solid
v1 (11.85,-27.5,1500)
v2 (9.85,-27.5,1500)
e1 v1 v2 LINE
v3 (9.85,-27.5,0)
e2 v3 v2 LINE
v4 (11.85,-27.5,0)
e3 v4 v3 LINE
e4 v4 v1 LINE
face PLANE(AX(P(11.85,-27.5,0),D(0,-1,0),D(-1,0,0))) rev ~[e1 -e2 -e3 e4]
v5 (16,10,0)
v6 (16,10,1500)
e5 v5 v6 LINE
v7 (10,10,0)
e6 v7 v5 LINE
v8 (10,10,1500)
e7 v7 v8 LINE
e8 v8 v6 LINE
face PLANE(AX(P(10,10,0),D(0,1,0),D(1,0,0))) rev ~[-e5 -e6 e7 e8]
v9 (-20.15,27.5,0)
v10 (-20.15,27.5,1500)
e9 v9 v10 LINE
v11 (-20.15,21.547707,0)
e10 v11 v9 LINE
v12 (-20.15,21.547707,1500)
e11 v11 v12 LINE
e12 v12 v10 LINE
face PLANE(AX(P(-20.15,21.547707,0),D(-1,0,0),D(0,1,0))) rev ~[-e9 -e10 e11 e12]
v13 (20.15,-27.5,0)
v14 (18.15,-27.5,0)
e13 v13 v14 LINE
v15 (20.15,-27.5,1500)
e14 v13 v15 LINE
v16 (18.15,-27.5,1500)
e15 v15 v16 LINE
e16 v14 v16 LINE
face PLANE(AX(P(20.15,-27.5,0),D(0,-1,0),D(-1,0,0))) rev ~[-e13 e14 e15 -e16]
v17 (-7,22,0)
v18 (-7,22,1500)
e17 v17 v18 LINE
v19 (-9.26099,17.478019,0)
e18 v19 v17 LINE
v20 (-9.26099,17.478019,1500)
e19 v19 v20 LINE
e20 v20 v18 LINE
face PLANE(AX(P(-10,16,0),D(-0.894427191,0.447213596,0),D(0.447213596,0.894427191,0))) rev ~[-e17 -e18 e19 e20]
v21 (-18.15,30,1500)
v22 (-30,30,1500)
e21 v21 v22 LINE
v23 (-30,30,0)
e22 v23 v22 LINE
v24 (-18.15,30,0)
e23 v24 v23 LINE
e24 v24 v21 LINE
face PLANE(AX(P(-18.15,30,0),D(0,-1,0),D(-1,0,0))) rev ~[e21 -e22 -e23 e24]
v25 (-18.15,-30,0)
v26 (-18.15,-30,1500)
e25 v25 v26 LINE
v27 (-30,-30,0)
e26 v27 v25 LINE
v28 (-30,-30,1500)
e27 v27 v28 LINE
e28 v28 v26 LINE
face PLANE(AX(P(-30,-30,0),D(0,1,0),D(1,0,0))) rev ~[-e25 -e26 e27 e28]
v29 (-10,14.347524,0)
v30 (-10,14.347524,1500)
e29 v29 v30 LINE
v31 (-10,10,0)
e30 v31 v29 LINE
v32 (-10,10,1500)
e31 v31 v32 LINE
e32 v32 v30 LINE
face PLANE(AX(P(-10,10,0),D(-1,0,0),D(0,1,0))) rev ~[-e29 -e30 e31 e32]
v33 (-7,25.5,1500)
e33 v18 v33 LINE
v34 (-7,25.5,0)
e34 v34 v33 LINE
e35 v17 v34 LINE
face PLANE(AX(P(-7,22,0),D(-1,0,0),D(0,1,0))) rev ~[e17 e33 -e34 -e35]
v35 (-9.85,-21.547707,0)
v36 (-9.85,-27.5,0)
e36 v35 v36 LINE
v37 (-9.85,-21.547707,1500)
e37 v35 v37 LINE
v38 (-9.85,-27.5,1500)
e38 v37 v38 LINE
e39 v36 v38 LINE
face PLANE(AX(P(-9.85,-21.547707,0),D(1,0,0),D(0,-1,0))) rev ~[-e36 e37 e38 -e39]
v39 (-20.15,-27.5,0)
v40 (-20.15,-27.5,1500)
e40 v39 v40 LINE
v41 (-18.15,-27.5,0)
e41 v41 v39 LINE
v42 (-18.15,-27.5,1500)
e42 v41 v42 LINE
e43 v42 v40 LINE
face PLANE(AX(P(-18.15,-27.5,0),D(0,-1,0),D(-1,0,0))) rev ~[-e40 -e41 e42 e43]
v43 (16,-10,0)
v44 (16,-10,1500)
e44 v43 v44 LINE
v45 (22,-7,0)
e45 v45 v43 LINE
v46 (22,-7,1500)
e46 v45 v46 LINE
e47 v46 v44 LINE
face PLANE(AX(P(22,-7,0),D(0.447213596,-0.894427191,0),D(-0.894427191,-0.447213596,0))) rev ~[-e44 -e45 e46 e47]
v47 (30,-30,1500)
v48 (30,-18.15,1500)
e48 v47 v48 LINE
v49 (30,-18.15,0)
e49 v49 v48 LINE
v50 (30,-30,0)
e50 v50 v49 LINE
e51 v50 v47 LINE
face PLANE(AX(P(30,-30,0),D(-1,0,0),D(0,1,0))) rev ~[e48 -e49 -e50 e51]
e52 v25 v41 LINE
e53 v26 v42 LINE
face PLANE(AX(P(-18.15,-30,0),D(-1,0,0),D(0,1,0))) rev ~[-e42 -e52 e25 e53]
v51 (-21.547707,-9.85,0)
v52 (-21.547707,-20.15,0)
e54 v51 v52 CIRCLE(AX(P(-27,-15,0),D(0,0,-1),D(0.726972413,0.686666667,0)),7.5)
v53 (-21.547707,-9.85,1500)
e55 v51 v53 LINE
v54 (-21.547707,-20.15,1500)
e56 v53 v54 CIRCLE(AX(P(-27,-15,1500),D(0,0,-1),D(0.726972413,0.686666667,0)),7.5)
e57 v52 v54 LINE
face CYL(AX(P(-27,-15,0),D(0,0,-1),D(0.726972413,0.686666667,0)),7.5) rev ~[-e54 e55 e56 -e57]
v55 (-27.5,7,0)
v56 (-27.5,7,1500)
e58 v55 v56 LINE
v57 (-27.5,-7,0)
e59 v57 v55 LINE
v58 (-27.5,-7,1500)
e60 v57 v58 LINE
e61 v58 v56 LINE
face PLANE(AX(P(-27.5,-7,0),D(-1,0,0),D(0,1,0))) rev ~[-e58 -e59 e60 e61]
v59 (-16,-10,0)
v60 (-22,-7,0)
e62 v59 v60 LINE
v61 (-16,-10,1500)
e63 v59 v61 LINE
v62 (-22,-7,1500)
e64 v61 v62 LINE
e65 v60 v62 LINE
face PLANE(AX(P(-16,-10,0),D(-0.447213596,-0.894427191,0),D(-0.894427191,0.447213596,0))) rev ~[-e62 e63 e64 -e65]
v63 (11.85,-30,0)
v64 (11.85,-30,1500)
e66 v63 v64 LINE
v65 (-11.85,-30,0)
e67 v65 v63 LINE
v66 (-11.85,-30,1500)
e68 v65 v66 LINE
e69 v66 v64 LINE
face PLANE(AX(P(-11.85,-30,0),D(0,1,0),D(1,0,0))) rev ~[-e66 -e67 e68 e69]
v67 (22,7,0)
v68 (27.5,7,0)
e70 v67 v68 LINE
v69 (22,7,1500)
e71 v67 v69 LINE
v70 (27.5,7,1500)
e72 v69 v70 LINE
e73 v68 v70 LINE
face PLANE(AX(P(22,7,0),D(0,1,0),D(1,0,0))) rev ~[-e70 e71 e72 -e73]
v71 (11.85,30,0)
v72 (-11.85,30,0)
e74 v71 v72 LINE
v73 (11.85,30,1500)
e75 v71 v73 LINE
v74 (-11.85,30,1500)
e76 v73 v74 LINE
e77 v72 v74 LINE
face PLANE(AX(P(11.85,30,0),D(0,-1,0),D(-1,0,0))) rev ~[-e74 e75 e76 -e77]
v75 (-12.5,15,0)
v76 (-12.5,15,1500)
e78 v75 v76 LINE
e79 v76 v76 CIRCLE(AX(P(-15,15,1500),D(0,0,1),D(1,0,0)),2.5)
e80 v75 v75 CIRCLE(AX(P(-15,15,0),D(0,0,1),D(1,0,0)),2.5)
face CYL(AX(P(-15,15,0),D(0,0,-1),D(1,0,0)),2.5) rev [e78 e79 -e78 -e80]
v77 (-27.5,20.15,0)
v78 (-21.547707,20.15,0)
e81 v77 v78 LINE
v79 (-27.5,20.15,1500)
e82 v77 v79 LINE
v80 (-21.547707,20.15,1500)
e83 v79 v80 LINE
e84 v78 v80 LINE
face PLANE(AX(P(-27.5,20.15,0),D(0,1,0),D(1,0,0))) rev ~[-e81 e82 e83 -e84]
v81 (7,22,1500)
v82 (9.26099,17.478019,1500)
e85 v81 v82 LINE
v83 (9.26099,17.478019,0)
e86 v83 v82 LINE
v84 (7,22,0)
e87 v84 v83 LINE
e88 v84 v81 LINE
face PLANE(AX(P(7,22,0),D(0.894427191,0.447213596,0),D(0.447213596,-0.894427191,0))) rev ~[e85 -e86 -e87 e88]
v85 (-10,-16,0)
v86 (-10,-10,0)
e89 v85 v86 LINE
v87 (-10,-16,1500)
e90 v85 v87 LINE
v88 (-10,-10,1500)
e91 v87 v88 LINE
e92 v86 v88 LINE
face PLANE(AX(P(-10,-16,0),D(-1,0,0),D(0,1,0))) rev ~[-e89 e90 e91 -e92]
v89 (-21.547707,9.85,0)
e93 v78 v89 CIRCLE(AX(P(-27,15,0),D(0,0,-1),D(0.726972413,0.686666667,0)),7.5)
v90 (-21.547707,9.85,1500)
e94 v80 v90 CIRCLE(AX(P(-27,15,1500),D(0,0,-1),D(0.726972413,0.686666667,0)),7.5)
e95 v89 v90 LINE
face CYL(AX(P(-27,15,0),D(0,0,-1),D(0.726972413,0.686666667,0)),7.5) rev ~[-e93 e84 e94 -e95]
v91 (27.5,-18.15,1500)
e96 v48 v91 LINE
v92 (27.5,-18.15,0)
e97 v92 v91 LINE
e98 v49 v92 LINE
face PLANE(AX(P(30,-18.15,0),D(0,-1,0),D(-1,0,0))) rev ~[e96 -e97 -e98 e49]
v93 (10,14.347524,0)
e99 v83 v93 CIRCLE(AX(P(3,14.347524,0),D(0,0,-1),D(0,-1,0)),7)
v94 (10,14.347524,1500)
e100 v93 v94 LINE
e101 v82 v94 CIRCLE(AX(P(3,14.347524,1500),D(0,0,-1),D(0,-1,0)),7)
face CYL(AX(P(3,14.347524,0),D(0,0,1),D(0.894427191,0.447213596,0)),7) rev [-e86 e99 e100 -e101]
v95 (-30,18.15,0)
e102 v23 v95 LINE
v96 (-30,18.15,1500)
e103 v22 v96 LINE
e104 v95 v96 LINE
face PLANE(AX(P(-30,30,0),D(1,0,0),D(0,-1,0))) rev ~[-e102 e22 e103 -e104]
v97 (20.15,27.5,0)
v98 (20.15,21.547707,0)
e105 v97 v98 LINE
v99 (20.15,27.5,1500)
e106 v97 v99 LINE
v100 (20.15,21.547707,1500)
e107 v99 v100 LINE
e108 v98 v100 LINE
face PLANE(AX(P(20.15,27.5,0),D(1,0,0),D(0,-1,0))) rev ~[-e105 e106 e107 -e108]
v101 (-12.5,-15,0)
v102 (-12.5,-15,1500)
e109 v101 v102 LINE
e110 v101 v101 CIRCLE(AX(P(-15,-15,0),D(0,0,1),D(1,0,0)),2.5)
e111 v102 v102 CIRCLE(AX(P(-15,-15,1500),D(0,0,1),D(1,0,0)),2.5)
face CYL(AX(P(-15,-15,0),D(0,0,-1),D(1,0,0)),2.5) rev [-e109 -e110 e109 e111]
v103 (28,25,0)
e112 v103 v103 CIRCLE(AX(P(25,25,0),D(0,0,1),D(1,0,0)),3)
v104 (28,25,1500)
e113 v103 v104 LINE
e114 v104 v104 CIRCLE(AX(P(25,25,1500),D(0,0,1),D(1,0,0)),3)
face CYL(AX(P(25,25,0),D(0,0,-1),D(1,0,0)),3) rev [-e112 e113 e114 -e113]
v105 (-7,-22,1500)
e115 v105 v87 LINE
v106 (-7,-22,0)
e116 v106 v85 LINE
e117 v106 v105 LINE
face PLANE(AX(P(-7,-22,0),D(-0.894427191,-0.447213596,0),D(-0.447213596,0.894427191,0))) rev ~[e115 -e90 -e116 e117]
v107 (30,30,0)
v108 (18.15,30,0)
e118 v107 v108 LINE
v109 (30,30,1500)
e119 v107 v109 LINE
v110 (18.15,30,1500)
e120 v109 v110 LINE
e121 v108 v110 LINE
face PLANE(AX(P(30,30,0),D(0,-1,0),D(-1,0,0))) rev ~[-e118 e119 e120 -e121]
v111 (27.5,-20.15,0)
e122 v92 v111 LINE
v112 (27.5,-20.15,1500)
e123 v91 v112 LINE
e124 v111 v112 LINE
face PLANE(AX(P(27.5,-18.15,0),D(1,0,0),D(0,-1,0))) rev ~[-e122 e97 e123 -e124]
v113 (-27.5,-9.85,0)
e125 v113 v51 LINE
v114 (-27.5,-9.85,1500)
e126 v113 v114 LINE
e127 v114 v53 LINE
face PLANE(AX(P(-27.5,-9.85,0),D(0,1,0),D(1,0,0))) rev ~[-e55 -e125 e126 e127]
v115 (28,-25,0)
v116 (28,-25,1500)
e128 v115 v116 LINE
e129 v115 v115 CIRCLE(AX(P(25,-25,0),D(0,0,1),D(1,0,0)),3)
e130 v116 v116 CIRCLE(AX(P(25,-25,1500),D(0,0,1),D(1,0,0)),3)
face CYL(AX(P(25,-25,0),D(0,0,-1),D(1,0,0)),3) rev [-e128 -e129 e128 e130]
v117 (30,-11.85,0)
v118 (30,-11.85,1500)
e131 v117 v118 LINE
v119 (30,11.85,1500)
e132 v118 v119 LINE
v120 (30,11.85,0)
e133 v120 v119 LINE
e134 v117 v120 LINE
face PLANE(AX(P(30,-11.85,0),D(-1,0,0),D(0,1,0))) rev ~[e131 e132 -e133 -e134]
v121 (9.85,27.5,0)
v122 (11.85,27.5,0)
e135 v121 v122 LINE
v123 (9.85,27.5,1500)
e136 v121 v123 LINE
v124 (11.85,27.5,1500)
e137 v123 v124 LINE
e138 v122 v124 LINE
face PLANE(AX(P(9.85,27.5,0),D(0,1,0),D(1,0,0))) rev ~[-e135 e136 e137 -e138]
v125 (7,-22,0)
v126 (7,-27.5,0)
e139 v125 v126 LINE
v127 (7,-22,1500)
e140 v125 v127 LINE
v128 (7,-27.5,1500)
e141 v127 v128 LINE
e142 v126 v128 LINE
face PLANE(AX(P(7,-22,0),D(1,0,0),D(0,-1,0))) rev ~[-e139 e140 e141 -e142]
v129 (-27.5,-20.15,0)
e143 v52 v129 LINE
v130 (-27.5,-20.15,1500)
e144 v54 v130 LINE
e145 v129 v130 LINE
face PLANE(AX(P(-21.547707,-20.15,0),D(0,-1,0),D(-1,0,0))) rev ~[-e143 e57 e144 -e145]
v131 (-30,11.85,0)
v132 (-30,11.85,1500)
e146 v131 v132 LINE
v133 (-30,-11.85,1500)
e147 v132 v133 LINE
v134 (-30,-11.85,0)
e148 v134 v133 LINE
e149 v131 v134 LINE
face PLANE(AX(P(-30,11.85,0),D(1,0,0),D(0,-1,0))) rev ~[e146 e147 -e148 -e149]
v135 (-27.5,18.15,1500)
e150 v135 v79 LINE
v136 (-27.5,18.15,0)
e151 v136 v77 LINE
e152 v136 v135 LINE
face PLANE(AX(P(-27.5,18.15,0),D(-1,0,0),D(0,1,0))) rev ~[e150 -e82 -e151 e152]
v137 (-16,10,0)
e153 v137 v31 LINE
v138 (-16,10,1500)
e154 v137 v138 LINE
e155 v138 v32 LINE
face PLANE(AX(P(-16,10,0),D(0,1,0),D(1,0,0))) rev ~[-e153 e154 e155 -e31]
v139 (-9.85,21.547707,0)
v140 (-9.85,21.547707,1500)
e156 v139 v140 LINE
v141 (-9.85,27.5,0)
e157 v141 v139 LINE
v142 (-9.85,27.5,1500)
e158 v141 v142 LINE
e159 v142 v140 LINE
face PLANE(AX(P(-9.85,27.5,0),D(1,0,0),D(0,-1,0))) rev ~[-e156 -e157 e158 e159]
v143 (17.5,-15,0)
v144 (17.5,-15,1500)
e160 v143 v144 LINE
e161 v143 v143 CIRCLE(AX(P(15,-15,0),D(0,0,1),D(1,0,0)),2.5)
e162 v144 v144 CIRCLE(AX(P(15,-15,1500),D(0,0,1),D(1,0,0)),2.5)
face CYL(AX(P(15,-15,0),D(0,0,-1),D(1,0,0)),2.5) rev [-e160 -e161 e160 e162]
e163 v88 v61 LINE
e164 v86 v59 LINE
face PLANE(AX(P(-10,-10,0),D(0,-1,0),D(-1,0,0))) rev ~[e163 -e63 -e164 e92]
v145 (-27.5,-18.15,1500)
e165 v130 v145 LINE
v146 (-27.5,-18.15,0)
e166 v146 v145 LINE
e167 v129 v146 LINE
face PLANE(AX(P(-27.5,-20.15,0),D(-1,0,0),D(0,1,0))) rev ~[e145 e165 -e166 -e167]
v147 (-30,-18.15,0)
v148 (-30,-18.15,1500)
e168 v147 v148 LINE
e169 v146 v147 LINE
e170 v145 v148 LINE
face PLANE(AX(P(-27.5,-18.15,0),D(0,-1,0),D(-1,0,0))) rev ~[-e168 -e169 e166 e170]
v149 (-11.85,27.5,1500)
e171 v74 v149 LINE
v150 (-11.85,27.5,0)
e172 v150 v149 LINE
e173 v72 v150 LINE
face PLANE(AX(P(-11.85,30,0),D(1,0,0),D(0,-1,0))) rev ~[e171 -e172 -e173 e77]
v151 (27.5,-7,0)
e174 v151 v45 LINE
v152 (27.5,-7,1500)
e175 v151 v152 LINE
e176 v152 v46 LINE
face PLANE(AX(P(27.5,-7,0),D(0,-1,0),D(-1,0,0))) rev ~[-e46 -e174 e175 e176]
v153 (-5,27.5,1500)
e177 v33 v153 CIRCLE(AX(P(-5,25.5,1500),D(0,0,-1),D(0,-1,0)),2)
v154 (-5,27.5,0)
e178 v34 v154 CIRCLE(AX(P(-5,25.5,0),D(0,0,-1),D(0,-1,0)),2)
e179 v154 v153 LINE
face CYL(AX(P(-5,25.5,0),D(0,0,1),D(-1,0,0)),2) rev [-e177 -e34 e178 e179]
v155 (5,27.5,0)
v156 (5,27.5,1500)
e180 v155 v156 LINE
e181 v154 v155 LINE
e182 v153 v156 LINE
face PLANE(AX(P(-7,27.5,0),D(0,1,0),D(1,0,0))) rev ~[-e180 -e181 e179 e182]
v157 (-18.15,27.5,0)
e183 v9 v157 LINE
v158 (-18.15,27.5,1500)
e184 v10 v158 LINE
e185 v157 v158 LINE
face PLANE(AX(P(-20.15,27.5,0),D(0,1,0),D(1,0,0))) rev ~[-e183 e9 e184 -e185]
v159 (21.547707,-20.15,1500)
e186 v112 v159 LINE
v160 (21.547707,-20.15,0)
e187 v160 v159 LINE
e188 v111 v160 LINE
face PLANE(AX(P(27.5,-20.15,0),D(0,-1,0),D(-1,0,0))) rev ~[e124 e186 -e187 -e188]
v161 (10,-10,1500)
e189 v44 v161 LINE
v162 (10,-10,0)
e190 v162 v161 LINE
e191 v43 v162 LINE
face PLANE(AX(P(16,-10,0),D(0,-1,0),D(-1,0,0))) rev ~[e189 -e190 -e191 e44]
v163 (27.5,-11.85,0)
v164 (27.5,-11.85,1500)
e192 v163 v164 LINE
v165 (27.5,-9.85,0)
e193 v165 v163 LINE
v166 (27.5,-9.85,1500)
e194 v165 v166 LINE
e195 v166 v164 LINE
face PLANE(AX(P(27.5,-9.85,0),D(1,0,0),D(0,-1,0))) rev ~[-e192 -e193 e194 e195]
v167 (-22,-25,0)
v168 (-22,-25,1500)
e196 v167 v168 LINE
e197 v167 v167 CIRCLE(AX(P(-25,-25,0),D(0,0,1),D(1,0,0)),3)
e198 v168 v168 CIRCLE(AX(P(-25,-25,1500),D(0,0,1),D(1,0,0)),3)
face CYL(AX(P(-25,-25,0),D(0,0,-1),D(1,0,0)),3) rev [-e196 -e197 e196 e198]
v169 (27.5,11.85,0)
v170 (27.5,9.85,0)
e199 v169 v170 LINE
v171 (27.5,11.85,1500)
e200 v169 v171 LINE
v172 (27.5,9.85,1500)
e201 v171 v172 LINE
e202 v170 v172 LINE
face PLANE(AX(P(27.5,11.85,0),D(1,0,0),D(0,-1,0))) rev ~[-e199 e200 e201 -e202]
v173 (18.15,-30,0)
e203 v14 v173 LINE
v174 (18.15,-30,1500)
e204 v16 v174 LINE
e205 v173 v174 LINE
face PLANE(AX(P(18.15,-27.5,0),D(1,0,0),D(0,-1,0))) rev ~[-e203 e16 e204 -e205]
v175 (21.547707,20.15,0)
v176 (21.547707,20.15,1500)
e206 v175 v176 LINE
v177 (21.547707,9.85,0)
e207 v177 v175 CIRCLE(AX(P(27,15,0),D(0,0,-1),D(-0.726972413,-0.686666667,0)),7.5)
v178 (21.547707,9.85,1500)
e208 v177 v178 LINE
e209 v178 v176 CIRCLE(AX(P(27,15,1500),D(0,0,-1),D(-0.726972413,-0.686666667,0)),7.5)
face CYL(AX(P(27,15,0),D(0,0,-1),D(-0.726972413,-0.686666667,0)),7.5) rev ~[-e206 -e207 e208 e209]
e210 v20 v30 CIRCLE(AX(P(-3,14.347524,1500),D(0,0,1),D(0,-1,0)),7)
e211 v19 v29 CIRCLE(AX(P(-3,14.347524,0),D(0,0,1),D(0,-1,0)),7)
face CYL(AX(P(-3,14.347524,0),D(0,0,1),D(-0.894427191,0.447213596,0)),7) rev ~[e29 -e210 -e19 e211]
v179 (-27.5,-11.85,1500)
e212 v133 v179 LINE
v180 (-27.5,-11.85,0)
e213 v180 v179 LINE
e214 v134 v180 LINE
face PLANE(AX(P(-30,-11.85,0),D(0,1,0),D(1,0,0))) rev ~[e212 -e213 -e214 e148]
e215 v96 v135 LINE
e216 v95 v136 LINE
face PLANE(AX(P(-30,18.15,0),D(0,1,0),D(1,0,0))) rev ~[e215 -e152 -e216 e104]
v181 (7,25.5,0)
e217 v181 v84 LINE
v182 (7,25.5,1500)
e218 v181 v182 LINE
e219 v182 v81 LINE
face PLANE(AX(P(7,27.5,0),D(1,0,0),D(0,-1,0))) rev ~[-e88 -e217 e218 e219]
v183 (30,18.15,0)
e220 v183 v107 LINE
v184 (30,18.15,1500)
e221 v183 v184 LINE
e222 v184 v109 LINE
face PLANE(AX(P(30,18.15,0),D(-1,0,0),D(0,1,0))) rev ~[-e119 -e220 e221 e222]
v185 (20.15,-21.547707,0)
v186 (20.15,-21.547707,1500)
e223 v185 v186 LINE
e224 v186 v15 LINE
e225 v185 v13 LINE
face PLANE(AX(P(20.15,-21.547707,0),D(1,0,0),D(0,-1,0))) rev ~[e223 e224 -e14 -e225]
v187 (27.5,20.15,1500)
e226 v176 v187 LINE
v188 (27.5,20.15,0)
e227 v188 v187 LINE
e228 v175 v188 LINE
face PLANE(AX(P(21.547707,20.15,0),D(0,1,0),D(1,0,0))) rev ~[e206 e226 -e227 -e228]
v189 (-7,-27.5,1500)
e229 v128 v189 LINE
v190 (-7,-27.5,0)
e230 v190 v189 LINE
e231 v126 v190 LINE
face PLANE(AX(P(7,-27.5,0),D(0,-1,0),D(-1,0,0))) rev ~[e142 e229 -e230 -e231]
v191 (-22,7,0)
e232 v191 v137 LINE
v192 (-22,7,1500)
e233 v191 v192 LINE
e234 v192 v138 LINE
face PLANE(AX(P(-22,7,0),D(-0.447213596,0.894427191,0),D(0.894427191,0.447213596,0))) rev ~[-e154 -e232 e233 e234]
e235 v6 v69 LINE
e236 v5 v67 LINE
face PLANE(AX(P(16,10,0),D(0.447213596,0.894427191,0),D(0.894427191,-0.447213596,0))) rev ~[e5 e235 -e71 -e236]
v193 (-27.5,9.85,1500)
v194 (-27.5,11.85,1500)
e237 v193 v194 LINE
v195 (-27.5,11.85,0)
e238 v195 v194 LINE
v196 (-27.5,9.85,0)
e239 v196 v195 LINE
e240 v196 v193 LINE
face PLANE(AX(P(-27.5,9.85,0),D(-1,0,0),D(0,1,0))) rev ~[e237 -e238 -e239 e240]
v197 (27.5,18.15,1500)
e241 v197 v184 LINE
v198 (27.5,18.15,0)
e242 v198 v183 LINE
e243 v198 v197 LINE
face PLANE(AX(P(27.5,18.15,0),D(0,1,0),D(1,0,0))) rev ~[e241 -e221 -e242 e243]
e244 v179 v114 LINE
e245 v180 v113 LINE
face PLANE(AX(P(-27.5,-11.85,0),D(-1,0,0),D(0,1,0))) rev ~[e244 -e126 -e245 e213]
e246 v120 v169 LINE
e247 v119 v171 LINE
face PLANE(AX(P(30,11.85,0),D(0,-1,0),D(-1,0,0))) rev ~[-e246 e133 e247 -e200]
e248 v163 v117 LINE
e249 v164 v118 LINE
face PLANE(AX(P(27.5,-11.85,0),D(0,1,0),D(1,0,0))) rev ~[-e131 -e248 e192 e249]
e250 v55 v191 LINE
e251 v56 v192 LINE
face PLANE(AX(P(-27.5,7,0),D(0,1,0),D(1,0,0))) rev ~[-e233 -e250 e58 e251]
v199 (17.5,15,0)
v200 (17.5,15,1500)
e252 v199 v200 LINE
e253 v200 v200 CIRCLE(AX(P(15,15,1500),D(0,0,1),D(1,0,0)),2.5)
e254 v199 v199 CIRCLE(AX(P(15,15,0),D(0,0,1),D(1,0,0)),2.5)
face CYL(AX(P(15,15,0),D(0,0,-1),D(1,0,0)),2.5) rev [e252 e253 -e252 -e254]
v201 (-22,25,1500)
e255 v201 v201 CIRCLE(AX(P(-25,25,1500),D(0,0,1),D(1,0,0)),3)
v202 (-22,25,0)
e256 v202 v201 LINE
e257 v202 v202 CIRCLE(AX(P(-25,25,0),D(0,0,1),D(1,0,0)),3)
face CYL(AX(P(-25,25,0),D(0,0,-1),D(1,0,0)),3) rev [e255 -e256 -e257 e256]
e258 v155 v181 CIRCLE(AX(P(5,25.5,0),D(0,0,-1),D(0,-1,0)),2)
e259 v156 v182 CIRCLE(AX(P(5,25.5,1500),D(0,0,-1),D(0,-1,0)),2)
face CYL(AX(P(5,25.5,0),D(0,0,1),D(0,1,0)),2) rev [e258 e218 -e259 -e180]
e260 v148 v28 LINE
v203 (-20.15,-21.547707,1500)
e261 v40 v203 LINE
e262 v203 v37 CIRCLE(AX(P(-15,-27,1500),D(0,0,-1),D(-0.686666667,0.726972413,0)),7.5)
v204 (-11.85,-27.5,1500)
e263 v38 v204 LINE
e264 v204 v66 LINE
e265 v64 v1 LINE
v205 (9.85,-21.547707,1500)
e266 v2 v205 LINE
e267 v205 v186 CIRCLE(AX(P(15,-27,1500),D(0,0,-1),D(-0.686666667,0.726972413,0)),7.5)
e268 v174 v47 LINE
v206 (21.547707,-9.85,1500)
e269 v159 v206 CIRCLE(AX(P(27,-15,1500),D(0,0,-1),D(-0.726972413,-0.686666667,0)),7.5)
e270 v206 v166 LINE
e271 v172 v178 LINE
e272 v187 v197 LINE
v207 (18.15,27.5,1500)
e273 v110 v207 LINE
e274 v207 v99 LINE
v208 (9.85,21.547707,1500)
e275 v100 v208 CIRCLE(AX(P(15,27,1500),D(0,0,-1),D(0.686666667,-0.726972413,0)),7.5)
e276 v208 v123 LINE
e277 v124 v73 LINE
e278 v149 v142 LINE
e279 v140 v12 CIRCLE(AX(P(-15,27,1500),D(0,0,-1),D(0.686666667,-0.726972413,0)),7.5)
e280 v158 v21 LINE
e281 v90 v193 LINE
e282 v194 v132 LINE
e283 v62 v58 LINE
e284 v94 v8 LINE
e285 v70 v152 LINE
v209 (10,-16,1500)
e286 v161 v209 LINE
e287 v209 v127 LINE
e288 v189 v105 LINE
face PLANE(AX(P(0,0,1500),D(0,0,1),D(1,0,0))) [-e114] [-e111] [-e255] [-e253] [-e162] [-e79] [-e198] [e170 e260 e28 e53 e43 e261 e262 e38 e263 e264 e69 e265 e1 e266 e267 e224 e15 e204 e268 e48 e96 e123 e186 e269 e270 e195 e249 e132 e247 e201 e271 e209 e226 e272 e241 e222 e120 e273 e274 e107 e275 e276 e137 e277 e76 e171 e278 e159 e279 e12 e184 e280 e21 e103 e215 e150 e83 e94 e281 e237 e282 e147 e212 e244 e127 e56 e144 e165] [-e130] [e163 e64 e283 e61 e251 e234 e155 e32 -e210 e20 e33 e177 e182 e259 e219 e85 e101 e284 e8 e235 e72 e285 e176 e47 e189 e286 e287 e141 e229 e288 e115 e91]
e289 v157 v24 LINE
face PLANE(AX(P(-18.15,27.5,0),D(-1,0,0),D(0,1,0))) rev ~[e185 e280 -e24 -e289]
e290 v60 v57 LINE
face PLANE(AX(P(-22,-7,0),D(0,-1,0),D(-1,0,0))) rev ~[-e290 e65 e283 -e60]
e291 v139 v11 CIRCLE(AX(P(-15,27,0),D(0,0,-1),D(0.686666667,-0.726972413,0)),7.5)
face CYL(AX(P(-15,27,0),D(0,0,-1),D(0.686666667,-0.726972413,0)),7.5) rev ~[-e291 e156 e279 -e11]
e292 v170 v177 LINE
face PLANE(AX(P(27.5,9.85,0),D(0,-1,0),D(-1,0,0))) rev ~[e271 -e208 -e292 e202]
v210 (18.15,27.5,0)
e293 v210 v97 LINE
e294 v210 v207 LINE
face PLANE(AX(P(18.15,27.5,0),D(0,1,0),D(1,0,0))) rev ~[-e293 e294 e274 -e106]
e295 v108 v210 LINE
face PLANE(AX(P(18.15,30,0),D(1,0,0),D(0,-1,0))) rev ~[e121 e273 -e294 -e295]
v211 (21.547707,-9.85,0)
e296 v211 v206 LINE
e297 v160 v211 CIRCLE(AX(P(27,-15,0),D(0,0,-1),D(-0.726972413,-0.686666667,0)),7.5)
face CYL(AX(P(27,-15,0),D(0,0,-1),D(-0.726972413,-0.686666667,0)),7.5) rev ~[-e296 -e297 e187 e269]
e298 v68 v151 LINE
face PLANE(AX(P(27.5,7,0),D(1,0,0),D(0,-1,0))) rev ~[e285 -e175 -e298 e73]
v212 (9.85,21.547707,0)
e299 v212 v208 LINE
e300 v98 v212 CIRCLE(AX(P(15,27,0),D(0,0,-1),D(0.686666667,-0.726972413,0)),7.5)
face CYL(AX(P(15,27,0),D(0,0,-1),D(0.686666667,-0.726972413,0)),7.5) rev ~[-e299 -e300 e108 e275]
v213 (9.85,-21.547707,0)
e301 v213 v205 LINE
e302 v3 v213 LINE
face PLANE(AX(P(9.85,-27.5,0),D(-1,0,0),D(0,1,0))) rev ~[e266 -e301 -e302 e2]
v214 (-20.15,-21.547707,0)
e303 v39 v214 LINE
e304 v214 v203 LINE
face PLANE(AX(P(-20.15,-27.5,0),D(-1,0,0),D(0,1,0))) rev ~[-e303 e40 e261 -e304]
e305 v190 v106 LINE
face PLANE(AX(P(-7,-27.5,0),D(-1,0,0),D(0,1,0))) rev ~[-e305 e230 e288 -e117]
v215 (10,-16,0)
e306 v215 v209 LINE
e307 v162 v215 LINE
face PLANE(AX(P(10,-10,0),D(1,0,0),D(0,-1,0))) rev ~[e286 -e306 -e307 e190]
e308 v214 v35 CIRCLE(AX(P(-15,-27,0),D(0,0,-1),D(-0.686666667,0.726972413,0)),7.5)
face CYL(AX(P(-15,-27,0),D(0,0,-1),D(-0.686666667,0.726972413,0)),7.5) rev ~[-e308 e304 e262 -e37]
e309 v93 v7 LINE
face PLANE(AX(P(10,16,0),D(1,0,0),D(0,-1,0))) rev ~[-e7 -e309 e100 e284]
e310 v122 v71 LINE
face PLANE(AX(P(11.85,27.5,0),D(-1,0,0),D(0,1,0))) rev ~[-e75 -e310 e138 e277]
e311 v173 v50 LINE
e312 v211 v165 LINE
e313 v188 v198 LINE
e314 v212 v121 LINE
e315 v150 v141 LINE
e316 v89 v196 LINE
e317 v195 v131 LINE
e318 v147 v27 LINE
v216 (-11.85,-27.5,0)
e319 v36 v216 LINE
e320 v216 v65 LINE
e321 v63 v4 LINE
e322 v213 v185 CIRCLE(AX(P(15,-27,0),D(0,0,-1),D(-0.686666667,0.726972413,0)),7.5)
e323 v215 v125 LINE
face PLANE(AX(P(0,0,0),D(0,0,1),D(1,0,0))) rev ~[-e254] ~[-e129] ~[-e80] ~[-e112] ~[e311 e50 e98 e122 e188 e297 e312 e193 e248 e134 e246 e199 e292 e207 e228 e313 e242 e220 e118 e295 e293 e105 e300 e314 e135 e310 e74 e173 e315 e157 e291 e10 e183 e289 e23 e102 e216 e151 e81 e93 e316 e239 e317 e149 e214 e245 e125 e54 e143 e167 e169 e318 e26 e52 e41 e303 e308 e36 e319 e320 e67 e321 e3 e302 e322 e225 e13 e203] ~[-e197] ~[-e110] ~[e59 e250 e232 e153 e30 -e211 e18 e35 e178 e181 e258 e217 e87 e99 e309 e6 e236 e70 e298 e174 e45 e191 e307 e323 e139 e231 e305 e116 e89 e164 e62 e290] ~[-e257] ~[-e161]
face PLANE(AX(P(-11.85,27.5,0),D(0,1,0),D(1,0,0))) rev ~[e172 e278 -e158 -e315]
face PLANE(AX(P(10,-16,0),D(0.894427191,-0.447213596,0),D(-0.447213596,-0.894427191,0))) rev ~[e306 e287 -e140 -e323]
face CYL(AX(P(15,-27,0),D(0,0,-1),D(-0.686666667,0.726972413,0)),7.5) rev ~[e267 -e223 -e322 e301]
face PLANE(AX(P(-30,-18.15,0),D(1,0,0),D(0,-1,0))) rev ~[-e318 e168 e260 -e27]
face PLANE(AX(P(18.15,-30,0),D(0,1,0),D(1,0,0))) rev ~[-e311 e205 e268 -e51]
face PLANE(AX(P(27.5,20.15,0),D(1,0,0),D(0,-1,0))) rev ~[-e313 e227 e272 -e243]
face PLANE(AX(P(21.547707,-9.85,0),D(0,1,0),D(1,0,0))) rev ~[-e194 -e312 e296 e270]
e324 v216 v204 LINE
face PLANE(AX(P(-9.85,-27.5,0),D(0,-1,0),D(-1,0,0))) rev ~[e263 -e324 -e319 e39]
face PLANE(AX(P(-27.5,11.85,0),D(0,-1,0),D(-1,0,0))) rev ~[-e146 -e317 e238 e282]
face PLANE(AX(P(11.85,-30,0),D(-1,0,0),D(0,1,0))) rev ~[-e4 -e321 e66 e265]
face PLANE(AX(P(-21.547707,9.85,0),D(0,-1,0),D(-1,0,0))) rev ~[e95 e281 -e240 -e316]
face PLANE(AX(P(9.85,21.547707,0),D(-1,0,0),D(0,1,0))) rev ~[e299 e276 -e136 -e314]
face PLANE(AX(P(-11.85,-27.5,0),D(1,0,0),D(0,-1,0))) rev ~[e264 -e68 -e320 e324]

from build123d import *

# Parameters (mm, degrees)
F0_R     = 3
F0_R_2   = 2.5
F1_DEPTH = 1500
F2_R     = 2
F3_R     = 7


# Not quite as in the source:
# - a feature names something its author has since deleted; it is built from what else it names


with BuildPart() as f1:
    # F0 (on Top) → F1 (new body)
    with BuildSketch(Plane.XY):
        with BuildLine():
            Line((18.15, -30), (30, -30))
            Line((30, -30), (30, -18.15))
            Line((30, -18.15), (27.5, -18.15))
            Line((27.5, -18.15), (27.5, -20.15))
            Line((27.5, -20.15), (21.5477069044, -20.15))
            ThreePointArc((21.5477069044, -20.15), (19.5, -15), (21.5477069044, -9.85))
            Line((21.5477069044, -9.85), (27.5, -9.85))
            Line((27.5, -9.85), (27.5, -11.85))
            Line((27.5, -11.85), (30, -11.85))
            Line((30, -11.85), (30, 11.85))
            Line((30, 11.85), (27.5, 11.85))
            Line((27.5, 11.85), (27.5, 9.85))
            Line((27.5, 9.85), (21.5477069044, 9.85))
            ThreePointArc((21.5477069044, 9.85), (19.5, 15), (21.5477069044, 20.15))
            Line((21.5477069044, 20.15), (27.5, 20.15))
            Line((27.5, 20.15), (27.5, 18.15))
            Line((27.5, 18.15), (30, 18.15))
            Line((30, 18.15), (30, 30))
            Line((30, 30), (18.15, 30))
            Line((18.15, 30), (18.15, 27.5))
            Line((18.15, 27.5), (20.15, 27.5))
            Line((20.15, 27.5), (20.15, 21.5477069044))
            ThreePointArc((20.15, 21.5477069044), (15, 19.5), (9.85, 21.5477069044))
            Line((9.85, 21.5477069044), (9.85, 27.5))
            Line((9.85, 27.5), (11.85, 27.5))
            Line((11.85, 27.5), (11.85, 30))
            Line((11.85, 30), (-11.85, 30))
            Line((-11.85, 30), (-11.85, 27.5))
            Line((-11.85, 27.5), (-9.85, 27.5))
            Line((-9.85, 27.5), (-9.85, 21.5477069044))
            ThreePointArc((-9.85, 21.5477069044), (-15, 19.5), (-20.15, 21.5477069044))
            Line((-20.15, 21.5477069044), (-20.15, 27.5))
            Line((-20.15, 27.5), (-18.15, 27.5))
            Line((-18.15, 27.5), (-18.15, 30))
            Line((-18.15, 30), (-30, 30))
            Line((-30, 30), (-30, 18.15))
            Line((-30, 18.15), (-27.5, 18.15))
            Line((-27.5, 18.15), (-27.5, 20.15))
            Line((-27.5, 20.15), (-21.5477069044, 20.15))
            ThreePointArc((-21.5477069044, 20.15), (-19.5, 15), (-21.5477069044, 9.85))
            Line((-21.5477069044, 9.85), (-27.5, 9.85))
            Line((-27.5, 9.85), (-27.5, 11.85))
            Line((-27.5, 11.85), (-30, 11.85))
            Line((-30, 11.85), (-30, -11.85))
            Line((-30, -11.85), (-27.5, -11.85))
            Line((-27.5, -11.85), (-27.5, -9.85))
            Line((-27.5, -9.85), (-21.5477069044, -9.85))
            ThreePointArc((-21.5477069044, -9.85), (-19.5, -15), (-21.5477069044, -20.15))
            Line((-21.5477069044, -20.15), (-27.5, -20.15))
            Line((-27.5, -20.15), (-27.5, -18.15))
            Line((-27.5, -18.15), (-30, -18.15))
            Line((-30, -18.15), (-30, -30))
            Line((-30, -30), (-18.15, -30))
            Line((-18.15, -30), (-18.15, -27.5))
            Line((-18.15, -27.5), (-20.15, -27.5))
            Line((-20.15, -27.5), (-20.15, -21.5477069044))
            ThreePointArc((-20.15, -21.5477069044), (-15, -19.5), (-9.85, -21.5477069044))
            Line((-9.85, -21.5477069044), (-9.85, -27.5))
            Line((-9.85, -27.5), (-11.85, -27.5))
            Line((-11.85, -27.5), (-11.85, -30))
            Line((-11.85, -30), (11.85, -30))
            Line((11.85, -30), (11.85, -27.5))
            Line((11.85, -27.5), (9.85, -27.5))
            Line((9.85, -27.5), (9.85, -21.5477069044))
            ThreePointArc((9.85, -21.5477069044), (15, -19.5), (20.15, -21.5477069044))
            Line((20.15, -21.5477069044), (20.15, -27.5))
            Line((20.15, -27.5), (18.15, -27.5))
            Line((18.15, -27.5), (18.15, -30))
        make_face()
        with Locations((-25, -25)):
            Circle(F0_R, mode=Mode.SUBTRACT)
        with Locations((-15, -15)):
            Circle(F0_R_2, mode=Mode.SUBTRACT)
        with Locations((25, -25)):
            Circle(F0_R, mode=Mode.SUBTRACT)
        with Locations((15, -15)):
            Circle(F0_R_2, mode=Mode.SUBTRACT)
        with Locations((-25, 25)):
            Circle(F0_R, mode=Mode.SUBTRACT)
        with Locations((-15, 15)):
            Circle(F0_R_2, mode=Mode.SUBTRACT)
        Polygon((-7, 22), (-7, 27.5), (0, 27.5), (7, 27.5), (7, 22), (10, 16), (10, 10), (16, 10), (22, 7), (27.5, 7), (27.5, 0), (27.5, -7), (22, -7), (16, -10), (10, -10), (10, -16), (7, -22), (7, -27.5), (0, -27.5), (-7, -27.5), (-7, -22), (-10, -16), (-10, -10), (-16, -10), (-22, -7), (-27.5, -7), (-27.5, 0), (-27.5, 7), (-22, 7), (-16, 10), (-10, 10), (-10, 16), align=None, mode=Mode.SUBTRACT)
        with Locations((15, 15)):
            Circle(F0_R_2, mode=Mode.SUBTRACT)
        with Locations((25, 25)):
            Circle(F0_R, mode=Mode.SUBTRACT)
    extrude(amount=F1_DEPTH)

    # F2
    f2_edges = [f1.edges().sort_by_distance(p)[0] for p in [
        (-7, 27.5, 750),
        (7, 27.5, 750),
    ]]
    fillet(f2_edges, radius=F2_R)

    # F3
    f3_edges = [f1.edges().sort_by_distance(p)[0] for p in [
        (-10, 16, 750),
        (10, 16, 750),
    ]]
    fillet(f3_edges, radius=F3_R)


solid = f1.part
